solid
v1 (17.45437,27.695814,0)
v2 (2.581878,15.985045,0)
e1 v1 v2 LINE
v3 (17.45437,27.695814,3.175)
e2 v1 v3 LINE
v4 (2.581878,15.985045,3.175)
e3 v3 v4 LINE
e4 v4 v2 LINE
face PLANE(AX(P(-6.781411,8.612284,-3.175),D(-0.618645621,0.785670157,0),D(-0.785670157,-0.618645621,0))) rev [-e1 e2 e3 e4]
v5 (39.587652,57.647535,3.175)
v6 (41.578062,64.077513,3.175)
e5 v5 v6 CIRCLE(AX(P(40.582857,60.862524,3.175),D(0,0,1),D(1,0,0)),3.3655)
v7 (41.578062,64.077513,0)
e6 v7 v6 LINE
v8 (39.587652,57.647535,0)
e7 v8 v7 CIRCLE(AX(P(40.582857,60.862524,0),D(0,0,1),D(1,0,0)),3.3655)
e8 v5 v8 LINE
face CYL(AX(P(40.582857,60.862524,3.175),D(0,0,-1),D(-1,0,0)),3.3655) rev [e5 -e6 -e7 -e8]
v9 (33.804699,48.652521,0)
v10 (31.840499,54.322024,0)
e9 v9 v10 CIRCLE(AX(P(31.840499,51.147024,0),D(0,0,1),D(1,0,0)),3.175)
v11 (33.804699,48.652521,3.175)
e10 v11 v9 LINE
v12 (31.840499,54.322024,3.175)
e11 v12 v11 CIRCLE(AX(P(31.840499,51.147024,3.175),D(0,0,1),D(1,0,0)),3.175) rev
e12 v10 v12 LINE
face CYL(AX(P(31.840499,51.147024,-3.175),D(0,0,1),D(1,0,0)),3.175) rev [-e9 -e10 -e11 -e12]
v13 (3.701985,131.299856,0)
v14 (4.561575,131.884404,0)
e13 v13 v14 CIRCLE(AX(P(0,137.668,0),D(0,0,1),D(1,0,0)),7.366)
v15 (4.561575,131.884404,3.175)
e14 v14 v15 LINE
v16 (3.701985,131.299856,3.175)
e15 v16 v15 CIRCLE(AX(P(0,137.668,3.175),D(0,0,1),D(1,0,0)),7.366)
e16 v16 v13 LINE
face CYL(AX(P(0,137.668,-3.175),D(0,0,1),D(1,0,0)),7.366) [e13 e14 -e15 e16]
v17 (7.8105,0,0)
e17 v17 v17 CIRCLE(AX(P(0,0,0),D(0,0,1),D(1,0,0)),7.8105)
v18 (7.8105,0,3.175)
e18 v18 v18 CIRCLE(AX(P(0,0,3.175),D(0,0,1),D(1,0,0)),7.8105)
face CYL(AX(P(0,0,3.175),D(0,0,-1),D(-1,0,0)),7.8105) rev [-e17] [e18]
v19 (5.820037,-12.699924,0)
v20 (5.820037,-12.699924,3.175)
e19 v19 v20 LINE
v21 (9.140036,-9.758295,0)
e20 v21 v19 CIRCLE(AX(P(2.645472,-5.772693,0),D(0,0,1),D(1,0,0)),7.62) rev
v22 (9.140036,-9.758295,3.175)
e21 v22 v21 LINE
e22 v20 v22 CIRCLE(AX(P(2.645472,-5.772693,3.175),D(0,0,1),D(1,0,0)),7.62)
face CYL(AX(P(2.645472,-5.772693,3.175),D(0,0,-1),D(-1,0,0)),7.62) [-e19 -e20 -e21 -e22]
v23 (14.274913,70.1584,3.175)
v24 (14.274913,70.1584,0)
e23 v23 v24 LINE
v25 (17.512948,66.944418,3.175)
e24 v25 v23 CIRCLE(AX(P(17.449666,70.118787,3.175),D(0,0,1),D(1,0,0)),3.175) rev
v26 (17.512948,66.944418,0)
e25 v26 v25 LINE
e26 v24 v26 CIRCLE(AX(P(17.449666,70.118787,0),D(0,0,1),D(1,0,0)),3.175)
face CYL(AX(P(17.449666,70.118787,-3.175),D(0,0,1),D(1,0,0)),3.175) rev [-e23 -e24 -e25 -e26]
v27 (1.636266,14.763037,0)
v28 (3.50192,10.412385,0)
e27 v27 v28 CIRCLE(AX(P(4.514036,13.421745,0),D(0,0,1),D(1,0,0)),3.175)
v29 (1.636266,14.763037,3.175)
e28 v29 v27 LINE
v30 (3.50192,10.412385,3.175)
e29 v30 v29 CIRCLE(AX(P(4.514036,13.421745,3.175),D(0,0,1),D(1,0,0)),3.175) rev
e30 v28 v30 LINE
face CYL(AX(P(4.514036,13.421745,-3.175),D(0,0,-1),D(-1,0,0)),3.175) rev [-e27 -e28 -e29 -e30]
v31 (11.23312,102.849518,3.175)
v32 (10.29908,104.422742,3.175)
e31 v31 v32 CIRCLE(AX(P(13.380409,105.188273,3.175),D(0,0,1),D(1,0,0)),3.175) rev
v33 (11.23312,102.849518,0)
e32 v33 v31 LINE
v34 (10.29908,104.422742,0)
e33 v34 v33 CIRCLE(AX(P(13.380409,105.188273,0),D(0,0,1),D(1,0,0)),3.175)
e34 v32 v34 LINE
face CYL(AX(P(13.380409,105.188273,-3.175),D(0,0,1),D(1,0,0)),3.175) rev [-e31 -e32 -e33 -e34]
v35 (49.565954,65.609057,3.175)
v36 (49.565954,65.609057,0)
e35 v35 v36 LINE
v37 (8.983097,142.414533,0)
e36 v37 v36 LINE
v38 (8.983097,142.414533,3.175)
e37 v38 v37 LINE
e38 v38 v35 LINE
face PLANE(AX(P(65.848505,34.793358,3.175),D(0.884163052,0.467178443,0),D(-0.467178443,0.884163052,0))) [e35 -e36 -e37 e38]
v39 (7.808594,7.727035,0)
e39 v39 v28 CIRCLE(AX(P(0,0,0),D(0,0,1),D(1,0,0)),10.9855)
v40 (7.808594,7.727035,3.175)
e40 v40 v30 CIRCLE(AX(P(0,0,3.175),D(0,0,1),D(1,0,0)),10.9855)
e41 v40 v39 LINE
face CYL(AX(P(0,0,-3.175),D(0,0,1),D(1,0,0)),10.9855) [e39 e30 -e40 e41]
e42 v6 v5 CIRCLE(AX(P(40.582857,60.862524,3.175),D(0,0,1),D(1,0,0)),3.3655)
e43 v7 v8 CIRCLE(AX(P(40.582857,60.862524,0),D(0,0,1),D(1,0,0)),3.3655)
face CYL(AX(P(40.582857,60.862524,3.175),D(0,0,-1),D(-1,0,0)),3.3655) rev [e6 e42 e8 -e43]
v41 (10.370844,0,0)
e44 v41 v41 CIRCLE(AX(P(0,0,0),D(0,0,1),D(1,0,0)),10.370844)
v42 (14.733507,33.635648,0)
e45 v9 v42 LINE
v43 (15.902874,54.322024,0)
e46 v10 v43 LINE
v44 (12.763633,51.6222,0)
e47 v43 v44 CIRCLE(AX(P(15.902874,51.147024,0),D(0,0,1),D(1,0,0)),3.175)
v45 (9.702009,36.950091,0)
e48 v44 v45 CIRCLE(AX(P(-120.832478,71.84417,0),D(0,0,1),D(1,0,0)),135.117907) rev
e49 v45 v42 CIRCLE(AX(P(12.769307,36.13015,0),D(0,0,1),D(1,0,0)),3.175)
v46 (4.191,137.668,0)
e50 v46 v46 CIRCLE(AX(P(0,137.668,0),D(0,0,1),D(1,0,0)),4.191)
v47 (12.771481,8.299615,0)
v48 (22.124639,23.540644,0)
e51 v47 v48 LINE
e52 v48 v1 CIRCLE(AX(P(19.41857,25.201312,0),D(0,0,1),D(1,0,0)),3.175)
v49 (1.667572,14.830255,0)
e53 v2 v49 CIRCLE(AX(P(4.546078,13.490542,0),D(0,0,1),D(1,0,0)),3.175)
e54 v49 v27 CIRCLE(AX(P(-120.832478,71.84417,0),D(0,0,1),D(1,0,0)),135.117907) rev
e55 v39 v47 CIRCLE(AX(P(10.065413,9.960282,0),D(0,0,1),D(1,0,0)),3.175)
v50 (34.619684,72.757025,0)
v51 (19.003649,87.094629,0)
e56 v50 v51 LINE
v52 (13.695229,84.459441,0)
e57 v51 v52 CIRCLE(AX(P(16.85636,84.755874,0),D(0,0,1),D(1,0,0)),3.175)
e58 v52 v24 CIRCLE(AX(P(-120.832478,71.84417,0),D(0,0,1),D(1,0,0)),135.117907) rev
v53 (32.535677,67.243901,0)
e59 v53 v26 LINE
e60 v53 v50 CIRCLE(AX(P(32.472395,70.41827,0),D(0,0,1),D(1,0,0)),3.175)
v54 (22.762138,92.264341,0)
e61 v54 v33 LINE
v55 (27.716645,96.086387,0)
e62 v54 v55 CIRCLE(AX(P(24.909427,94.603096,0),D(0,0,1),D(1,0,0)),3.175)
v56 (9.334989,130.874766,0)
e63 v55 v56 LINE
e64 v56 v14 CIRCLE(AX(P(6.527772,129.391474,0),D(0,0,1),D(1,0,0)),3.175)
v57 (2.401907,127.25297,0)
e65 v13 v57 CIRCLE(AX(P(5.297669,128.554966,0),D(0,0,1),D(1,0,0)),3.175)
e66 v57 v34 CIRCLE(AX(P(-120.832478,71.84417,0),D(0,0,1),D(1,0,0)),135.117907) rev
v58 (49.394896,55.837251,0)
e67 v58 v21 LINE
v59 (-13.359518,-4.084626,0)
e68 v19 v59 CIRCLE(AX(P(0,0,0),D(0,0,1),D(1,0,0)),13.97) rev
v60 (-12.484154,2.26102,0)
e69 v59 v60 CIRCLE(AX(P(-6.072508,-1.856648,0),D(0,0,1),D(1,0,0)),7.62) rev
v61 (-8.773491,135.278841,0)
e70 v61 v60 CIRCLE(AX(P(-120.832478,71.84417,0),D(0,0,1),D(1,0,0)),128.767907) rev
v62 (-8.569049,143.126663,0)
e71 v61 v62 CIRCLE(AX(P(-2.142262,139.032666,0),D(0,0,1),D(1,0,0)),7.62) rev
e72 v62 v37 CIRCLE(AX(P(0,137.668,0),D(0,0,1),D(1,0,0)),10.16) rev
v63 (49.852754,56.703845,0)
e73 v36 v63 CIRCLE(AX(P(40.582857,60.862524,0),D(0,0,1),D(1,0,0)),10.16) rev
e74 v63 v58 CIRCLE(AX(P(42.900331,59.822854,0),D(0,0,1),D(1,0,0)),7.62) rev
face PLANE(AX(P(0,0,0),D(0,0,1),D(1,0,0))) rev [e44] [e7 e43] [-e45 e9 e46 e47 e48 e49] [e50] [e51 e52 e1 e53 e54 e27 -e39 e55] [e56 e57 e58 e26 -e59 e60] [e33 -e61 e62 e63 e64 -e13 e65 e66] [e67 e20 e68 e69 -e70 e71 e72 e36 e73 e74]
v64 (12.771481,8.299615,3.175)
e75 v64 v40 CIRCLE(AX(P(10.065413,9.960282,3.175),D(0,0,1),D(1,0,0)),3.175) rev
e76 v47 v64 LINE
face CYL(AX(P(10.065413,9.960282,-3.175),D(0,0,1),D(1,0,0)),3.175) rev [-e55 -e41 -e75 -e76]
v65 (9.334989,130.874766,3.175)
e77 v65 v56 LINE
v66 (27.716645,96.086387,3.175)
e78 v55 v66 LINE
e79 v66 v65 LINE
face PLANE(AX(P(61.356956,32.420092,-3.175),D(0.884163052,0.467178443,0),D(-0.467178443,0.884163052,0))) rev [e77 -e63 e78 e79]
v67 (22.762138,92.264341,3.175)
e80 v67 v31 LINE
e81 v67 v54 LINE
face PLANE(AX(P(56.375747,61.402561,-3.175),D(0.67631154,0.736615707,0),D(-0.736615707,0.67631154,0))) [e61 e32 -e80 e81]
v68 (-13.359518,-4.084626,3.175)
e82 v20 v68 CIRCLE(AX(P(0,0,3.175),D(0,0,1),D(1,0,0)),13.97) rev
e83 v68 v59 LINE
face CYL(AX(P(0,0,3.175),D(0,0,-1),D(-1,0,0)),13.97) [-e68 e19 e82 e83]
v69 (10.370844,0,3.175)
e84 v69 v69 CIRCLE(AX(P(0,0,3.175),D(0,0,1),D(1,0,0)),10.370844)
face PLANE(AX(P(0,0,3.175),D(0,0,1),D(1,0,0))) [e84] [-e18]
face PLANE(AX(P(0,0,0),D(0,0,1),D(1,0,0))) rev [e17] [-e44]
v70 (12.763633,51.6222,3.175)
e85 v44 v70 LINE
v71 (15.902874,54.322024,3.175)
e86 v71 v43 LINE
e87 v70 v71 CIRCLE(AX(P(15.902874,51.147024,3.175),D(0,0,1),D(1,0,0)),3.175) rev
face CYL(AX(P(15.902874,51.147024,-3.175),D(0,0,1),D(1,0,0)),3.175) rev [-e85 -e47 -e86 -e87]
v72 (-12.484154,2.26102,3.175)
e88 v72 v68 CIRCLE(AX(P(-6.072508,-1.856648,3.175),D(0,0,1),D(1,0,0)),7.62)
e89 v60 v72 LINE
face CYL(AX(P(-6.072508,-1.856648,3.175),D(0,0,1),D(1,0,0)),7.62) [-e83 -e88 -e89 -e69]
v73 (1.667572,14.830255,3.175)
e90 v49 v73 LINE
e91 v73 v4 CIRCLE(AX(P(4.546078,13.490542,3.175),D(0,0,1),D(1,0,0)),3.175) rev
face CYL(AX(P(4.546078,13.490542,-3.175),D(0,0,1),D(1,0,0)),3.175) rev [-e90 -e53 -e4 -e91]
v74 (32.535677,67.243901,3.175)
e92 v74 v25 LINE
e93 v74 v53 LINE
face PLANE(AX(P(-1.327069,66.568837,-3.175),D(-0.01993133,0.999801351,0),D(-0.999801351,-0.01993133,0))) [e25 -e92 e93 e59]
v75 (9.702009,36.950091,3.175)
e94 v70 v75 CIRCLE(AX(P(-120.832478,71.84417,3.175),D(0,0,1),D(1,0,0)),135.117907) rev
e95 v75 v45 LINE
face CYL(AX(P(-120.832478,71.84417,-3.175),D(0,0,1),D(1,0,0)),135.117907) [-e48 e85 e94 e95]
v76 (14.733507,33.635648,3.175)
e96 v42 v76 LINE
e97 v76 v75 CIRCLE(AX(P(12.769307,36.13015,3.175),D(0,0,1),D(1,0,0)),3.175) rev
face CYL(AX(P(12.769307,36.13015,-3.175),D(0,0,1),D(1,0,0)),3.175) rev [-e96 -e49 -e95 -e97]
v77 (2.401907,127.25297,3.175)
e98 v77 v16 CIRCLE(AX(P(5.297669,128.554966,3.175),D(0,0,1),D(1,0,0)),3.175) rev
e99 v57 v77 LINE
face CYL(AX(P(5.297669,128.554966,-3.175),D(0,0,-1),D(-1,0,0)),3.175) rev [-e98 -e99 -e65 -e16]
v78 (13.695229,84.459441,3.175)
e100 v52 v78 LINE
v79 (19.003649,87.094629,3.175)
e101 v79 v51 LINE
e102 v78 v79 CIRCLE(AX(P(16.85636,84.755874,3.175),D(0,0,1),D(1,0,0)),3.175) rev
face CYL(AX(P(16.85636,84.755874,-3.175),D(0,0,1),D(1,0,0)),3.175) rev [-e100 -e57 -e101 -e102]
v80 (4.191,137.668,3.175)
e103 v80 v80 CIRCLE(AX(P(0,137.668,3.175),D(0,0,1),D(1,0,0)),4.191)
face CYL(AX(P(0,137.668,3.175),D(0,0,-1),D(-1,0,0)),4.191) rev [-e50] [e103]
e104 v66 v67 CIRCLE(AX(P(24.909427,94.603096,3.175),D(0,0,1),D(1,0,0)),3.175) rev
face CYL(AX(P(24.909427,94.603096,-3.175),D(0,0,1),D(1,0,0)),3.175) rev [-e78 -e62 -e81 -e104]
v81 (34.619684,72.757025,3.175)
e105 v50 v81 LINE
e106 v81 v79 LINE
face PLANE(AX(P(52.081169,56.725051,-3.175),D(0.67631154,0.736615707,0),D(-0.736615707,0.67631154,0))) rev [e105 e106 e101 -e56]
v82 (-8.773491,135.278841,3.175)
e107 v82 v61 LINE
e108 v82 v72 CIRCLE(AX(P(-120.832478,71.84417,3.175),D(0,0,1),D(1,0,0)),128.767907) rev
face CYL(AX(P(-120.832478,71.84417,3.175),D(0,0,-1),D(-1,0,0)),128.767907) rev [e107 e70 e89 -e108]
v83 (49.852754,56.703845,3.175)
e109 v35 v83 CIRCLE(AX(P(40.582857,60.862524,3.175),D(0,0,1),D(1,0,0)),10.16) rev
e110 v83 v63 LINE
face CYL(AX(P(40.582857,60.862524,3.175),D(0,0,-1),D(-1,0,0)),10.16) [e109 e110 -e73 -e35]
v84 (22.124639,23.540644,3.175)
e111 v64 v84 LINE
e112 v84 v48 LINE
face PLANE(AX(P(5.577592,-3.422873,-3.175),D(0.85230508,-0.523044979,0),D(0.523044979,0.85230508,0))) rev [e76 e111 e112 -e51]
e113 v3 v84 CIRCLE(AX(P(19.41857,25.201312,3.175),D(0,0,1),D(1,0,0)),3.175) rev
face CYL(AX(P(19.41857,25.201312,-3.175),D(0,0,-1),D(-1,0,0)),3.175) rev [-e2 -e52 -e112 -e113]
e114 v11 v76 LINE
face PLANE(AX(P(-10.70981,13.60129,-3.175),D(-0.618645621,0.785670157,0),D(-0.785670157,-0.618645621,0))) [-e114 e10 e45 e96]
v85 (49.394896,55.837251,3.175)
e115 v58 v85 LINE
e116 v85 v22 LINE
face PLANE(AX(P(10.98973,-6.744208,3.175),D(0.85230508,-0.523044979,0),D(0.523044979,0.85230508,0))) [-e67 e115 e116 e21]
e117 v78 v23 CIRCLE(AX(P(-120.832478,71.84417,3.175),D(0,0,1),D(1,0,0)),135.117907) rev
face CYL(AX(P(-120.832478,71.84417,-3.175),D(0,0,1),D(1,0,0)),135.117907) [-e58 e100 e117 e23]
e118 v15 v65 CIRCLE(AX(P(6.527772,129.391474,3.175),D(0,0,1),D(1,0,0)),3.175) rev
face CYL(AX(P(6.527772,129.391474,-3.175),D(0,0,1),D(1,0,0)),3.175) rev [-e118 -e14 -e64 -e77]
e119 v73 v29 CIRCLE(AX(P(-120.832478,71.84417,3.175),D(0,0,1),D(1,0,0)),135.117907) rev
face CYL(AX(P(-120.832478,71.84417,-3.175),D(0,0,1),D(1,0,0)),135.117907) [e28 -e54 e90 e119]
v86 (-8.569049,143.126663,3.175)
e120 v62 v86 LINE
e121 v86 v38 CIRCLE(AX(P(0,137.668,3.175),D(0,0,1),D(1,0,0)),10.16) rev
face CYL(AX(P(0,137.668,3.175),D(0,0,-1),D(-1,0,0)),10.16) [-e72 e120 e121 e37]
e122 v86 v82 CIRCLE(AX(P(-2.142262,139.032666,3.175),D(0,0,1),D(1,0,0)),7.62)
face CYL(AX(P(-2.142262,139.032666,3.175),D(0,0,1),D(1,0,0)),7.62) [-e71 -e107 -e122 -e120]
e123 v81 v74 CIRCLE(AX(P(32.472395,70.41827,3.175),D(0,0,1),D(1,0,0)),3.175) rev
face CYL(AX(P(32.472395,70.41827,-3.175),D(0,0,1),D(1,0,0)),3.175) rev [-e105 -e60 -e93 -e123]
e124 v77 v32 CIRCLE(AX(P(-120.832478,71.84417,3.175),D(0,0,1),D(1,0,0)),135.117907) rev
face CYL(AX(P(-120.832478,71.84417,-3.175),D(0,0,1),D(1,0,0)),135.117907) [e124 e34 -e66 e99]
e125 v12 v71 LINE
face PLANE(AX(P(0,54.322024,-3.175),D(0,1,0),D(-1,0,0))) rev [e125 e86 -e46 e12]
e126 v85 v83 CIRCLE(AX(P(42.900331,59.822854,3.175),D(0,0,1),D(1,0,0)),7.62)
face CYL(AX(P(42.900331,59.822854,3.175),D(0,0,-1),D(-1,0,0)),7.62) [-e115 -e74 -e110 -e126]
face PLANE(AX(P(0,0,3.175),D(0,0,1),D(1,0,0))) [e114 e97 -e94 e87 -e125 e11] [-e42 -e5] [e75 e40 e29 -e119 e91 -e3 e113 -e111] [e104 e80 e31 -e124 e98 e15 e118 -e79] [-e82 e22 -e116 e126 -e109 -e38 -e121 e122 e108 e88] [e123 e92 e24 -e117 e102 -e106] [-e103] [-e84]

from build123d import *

# Parameters (mm, degrees)
SKETCH1_R           = 7.8105
SKETCH1_R_2         = 3.3655
SKETCH1_R_3         = 4.191
BOSS_EXTRUDE1_DEPTH = 3.175
CUT_EXTRUDE1_DEPTH  = 6.35
FILLET1_R           = 3.175
FILLET5_R           = 7.62


with BuildPart() as part:
    # Sketch1 → Boss-Extrude1 (new body)
    with BuildSketch(Plane.XY):
        with BuildLine():
            Line((8.98309661, 142.414532976), (49.565953559, 65.609056962))
            ThreePointArc((49.565953559, 65.609056962), (50.742856949, 60.862523985), (49.565953559, 56.115991009))
            Line((49.565953559, 56.115991009), (8.177790267, -11.326281223))
            ThreePointArc((8.177790267, -11.326281223), (-6.360706327, -12.437938536), (-13.97, 0))
            ThreePointArc((-13.97, 0), (7.886144716, 68.281846548), (-10.16, 137.668))
            ThreePointArc((-10.16, 137.668), (-2.445131739, 147.529385845), (8.98309661, 142.414532976))
        make_face()
        Circle(SKETCH1_R, mode=Mode.SUBTRACT)
        with Locations((40.582856949, 60.862523985)):
            Circle(SKETCH1_R_2, mode=Mode.SUBTRACT)
        with Locations((0, 137.668)):
            Circle(SKETCH1_R_3, mode=Mode.SUBTRACT)
    extrude(amount=BOSS_EXTRUDE1_DEPTH)

    # Sketch2 → Cut-Extrude1 (cut)
    with BuildSketch(Plane.XY.offset(3.175)):
        with BuildLine():
            ThreePointArc((-0.197260951, 10.983728801), (6.068963009, 9.156904403), (10.192723194, 4.097511946))
            Line((10.192723194, 4.097511946), (31.425957659, 38.69720097))
            Line((31.425957659, 38.69720097), (1.983387122, 15.513785915))
            ThreePointArc((1.983387122, 15.513785915), (0.914134712, 13.238614042), (-0.197260951, 10.983728801))
        make_face()
        with BuildLine():
            Line((6.74876061, 27.348367338), (41.023773829, 54.336902746))
            ThreePointArc((41.023773829, 54.336902746), (40.803440874, 54.325744734), (40.582856949, 54.322023985))
            Line((40.582856949, 54.322023985), (13.144472644, 54.322023985))
            ThreePointArc((13.144472644, 54.322023985), (10.640204067, 40.670739444), (6.74876061, 27.348367338))
        make_face()
        with BuildLine():
            Line((14.194143868, 66.878256842), (40.452496082, 67.401724723))
            Line((40.452496082, 67.401724723), (12.62696706, 92.949274424))
            ThreePointArc((12.62696706, 92.949274424), (14.041969258, 79.951721077), (14.194143868, 66.878256842))
        make_face()
        with BuildLine():
            Line((10.524958055, 103.49970509), (36.307285582, 79.828087082))
            Line((36.307285582, 79.828087082), (6.983478118, 135.325140768))
            ThreePointArc((6.983478118, 135.325140768), (4.680665913, 131.980353508), (0.955265361, 130.364204816))
            ThreePointArc((0.955265361, 130.364204816), (6.450850846, 117.185134994), (10.524958055, 103.49970509))
        make_face()
    extrude(amount=-CUT_EXTRUDE1_DEPTH, mode=Mode.SUBTRACT)

    # Fillet1
    fillet1_edges = [part.edges().sort_by_distance(p)[0] for p in [
        (1.983387122, 15.513785915, 1.5875),
        (-0.197260951, 10.983728801, 1.5875),
        (10.192723194, 4.097511946, 1.5875),
        (31.425957659, 38.69720097, 1.5875),
        (41.023773829, 54.336902746, 1.5875),
        (6.74876061, 27.348367338, 1.5875),
        (13.144472644, 54.322023985, 1.5875),
        (12.62696706, 92.949274424, 1.5875),
        (14.194143868, 66.878256842, 1.5875),
        (40.452496082, 67.401724723, 1.5875),
        (36.307285582, 79.828087082, 1.5875),
        (10.524958055, 103.49970509, 1.5875),
        (0.955265361, 130.364204816, 1.5875),
        (6.983478118, 135.325140768, 1.5875),
    ]]
    fillet(fillet1_edges, radius=FILLET1_R)

    # Fillet5
    # the kernel refuses this fillet: 7.62 mm, written as the material it takes off along each edge
    with BuildSketch(Plane(origin=(49.565953559, 56.115991009, -1.635210381), x_dir=(0.4384758636480836, 0.8987429649227121, 0), z_dir=(0, 0, 1))) as fillet5_piece_1:
        with BuildLine():
            CenterArc((0.408802595, 7.616051271), FILLET5_R, 264.46995043, 7.374672414)
            Line((-0.325519955, 0.031516322), (0, 0))
            ThreePointArc((0, 0), (0.327042076, -0.005264972), (0.654084152, 0))
        make_face()
    extrude(amount=6.445420761, mode=Mode.SUBTRACT)
    with BuildSketch(Plane(origin=(8.177790267, -11.326281223, -6.821790927), x_dir=(-0.8640520418582298, -0.5034024920087542, 0), z_dir=(0, 0, 1))) as fillet5_piece_2:
        with BuildLine():
            CenterArc((1.984520997, -7.583572591), FILLET5_R, 84.39536353, 33.842547752)
            Line((-1.620758554, -0.870424346), (0, 0))
            ThreePointArc((0, 0), (1.364358185, 0.066783583), (2.728716371, 0))
        make_face()
    extrude(amount=16.818581854, mode=Mode.SUBTRACT)
    with BuildSketch(Plane(origin=(-13.97, 0, -10.324988133), x_dir=(0.5491862360699723, 0.8356999928869789, 0), z_dir=(0, 0, 1))) as fillet5_piece_3:
        with BuildLine():
            CenterArc((2.785592727, -7.619579496), FILLET5_R, 90.601931521, 49.710102388)
            ThreePointArc((-3.078254062, -2.753400211), (-1.641438538, -1.262317601), (0, 0))
            ThreePointArc((0, 0), (1.352770433, -0.007105957), (2.705540865, 0))
        make_face()
    extrude(amount=23.824976265, mode=Mode.SUBTRACT)
    with BuildSketch(Plane(origin=(-10.16, 137.668, -14.214457568), x_dir=(0.2798121568434471, 0.96005476764746, 0), z_dir=(0, 0, 1))) as fillet5_piece_4:
        with BuildLine():
            CenterArc((3.553614392, -7.315617329), FILLET5_R, 73.751006034, 62.011444153)
            ThreePointArc((-1.90576169, -1.999640205), (-0.947518647, -1.004930558), (0, 0))
            ThreePointArc((0, 0), (2.842891514, 0.405843561), (5.685783027, 0))
        make_face()
    extrude(amount=31.603915135, mode=Mode.SUBTRACT)


solid = part.part
